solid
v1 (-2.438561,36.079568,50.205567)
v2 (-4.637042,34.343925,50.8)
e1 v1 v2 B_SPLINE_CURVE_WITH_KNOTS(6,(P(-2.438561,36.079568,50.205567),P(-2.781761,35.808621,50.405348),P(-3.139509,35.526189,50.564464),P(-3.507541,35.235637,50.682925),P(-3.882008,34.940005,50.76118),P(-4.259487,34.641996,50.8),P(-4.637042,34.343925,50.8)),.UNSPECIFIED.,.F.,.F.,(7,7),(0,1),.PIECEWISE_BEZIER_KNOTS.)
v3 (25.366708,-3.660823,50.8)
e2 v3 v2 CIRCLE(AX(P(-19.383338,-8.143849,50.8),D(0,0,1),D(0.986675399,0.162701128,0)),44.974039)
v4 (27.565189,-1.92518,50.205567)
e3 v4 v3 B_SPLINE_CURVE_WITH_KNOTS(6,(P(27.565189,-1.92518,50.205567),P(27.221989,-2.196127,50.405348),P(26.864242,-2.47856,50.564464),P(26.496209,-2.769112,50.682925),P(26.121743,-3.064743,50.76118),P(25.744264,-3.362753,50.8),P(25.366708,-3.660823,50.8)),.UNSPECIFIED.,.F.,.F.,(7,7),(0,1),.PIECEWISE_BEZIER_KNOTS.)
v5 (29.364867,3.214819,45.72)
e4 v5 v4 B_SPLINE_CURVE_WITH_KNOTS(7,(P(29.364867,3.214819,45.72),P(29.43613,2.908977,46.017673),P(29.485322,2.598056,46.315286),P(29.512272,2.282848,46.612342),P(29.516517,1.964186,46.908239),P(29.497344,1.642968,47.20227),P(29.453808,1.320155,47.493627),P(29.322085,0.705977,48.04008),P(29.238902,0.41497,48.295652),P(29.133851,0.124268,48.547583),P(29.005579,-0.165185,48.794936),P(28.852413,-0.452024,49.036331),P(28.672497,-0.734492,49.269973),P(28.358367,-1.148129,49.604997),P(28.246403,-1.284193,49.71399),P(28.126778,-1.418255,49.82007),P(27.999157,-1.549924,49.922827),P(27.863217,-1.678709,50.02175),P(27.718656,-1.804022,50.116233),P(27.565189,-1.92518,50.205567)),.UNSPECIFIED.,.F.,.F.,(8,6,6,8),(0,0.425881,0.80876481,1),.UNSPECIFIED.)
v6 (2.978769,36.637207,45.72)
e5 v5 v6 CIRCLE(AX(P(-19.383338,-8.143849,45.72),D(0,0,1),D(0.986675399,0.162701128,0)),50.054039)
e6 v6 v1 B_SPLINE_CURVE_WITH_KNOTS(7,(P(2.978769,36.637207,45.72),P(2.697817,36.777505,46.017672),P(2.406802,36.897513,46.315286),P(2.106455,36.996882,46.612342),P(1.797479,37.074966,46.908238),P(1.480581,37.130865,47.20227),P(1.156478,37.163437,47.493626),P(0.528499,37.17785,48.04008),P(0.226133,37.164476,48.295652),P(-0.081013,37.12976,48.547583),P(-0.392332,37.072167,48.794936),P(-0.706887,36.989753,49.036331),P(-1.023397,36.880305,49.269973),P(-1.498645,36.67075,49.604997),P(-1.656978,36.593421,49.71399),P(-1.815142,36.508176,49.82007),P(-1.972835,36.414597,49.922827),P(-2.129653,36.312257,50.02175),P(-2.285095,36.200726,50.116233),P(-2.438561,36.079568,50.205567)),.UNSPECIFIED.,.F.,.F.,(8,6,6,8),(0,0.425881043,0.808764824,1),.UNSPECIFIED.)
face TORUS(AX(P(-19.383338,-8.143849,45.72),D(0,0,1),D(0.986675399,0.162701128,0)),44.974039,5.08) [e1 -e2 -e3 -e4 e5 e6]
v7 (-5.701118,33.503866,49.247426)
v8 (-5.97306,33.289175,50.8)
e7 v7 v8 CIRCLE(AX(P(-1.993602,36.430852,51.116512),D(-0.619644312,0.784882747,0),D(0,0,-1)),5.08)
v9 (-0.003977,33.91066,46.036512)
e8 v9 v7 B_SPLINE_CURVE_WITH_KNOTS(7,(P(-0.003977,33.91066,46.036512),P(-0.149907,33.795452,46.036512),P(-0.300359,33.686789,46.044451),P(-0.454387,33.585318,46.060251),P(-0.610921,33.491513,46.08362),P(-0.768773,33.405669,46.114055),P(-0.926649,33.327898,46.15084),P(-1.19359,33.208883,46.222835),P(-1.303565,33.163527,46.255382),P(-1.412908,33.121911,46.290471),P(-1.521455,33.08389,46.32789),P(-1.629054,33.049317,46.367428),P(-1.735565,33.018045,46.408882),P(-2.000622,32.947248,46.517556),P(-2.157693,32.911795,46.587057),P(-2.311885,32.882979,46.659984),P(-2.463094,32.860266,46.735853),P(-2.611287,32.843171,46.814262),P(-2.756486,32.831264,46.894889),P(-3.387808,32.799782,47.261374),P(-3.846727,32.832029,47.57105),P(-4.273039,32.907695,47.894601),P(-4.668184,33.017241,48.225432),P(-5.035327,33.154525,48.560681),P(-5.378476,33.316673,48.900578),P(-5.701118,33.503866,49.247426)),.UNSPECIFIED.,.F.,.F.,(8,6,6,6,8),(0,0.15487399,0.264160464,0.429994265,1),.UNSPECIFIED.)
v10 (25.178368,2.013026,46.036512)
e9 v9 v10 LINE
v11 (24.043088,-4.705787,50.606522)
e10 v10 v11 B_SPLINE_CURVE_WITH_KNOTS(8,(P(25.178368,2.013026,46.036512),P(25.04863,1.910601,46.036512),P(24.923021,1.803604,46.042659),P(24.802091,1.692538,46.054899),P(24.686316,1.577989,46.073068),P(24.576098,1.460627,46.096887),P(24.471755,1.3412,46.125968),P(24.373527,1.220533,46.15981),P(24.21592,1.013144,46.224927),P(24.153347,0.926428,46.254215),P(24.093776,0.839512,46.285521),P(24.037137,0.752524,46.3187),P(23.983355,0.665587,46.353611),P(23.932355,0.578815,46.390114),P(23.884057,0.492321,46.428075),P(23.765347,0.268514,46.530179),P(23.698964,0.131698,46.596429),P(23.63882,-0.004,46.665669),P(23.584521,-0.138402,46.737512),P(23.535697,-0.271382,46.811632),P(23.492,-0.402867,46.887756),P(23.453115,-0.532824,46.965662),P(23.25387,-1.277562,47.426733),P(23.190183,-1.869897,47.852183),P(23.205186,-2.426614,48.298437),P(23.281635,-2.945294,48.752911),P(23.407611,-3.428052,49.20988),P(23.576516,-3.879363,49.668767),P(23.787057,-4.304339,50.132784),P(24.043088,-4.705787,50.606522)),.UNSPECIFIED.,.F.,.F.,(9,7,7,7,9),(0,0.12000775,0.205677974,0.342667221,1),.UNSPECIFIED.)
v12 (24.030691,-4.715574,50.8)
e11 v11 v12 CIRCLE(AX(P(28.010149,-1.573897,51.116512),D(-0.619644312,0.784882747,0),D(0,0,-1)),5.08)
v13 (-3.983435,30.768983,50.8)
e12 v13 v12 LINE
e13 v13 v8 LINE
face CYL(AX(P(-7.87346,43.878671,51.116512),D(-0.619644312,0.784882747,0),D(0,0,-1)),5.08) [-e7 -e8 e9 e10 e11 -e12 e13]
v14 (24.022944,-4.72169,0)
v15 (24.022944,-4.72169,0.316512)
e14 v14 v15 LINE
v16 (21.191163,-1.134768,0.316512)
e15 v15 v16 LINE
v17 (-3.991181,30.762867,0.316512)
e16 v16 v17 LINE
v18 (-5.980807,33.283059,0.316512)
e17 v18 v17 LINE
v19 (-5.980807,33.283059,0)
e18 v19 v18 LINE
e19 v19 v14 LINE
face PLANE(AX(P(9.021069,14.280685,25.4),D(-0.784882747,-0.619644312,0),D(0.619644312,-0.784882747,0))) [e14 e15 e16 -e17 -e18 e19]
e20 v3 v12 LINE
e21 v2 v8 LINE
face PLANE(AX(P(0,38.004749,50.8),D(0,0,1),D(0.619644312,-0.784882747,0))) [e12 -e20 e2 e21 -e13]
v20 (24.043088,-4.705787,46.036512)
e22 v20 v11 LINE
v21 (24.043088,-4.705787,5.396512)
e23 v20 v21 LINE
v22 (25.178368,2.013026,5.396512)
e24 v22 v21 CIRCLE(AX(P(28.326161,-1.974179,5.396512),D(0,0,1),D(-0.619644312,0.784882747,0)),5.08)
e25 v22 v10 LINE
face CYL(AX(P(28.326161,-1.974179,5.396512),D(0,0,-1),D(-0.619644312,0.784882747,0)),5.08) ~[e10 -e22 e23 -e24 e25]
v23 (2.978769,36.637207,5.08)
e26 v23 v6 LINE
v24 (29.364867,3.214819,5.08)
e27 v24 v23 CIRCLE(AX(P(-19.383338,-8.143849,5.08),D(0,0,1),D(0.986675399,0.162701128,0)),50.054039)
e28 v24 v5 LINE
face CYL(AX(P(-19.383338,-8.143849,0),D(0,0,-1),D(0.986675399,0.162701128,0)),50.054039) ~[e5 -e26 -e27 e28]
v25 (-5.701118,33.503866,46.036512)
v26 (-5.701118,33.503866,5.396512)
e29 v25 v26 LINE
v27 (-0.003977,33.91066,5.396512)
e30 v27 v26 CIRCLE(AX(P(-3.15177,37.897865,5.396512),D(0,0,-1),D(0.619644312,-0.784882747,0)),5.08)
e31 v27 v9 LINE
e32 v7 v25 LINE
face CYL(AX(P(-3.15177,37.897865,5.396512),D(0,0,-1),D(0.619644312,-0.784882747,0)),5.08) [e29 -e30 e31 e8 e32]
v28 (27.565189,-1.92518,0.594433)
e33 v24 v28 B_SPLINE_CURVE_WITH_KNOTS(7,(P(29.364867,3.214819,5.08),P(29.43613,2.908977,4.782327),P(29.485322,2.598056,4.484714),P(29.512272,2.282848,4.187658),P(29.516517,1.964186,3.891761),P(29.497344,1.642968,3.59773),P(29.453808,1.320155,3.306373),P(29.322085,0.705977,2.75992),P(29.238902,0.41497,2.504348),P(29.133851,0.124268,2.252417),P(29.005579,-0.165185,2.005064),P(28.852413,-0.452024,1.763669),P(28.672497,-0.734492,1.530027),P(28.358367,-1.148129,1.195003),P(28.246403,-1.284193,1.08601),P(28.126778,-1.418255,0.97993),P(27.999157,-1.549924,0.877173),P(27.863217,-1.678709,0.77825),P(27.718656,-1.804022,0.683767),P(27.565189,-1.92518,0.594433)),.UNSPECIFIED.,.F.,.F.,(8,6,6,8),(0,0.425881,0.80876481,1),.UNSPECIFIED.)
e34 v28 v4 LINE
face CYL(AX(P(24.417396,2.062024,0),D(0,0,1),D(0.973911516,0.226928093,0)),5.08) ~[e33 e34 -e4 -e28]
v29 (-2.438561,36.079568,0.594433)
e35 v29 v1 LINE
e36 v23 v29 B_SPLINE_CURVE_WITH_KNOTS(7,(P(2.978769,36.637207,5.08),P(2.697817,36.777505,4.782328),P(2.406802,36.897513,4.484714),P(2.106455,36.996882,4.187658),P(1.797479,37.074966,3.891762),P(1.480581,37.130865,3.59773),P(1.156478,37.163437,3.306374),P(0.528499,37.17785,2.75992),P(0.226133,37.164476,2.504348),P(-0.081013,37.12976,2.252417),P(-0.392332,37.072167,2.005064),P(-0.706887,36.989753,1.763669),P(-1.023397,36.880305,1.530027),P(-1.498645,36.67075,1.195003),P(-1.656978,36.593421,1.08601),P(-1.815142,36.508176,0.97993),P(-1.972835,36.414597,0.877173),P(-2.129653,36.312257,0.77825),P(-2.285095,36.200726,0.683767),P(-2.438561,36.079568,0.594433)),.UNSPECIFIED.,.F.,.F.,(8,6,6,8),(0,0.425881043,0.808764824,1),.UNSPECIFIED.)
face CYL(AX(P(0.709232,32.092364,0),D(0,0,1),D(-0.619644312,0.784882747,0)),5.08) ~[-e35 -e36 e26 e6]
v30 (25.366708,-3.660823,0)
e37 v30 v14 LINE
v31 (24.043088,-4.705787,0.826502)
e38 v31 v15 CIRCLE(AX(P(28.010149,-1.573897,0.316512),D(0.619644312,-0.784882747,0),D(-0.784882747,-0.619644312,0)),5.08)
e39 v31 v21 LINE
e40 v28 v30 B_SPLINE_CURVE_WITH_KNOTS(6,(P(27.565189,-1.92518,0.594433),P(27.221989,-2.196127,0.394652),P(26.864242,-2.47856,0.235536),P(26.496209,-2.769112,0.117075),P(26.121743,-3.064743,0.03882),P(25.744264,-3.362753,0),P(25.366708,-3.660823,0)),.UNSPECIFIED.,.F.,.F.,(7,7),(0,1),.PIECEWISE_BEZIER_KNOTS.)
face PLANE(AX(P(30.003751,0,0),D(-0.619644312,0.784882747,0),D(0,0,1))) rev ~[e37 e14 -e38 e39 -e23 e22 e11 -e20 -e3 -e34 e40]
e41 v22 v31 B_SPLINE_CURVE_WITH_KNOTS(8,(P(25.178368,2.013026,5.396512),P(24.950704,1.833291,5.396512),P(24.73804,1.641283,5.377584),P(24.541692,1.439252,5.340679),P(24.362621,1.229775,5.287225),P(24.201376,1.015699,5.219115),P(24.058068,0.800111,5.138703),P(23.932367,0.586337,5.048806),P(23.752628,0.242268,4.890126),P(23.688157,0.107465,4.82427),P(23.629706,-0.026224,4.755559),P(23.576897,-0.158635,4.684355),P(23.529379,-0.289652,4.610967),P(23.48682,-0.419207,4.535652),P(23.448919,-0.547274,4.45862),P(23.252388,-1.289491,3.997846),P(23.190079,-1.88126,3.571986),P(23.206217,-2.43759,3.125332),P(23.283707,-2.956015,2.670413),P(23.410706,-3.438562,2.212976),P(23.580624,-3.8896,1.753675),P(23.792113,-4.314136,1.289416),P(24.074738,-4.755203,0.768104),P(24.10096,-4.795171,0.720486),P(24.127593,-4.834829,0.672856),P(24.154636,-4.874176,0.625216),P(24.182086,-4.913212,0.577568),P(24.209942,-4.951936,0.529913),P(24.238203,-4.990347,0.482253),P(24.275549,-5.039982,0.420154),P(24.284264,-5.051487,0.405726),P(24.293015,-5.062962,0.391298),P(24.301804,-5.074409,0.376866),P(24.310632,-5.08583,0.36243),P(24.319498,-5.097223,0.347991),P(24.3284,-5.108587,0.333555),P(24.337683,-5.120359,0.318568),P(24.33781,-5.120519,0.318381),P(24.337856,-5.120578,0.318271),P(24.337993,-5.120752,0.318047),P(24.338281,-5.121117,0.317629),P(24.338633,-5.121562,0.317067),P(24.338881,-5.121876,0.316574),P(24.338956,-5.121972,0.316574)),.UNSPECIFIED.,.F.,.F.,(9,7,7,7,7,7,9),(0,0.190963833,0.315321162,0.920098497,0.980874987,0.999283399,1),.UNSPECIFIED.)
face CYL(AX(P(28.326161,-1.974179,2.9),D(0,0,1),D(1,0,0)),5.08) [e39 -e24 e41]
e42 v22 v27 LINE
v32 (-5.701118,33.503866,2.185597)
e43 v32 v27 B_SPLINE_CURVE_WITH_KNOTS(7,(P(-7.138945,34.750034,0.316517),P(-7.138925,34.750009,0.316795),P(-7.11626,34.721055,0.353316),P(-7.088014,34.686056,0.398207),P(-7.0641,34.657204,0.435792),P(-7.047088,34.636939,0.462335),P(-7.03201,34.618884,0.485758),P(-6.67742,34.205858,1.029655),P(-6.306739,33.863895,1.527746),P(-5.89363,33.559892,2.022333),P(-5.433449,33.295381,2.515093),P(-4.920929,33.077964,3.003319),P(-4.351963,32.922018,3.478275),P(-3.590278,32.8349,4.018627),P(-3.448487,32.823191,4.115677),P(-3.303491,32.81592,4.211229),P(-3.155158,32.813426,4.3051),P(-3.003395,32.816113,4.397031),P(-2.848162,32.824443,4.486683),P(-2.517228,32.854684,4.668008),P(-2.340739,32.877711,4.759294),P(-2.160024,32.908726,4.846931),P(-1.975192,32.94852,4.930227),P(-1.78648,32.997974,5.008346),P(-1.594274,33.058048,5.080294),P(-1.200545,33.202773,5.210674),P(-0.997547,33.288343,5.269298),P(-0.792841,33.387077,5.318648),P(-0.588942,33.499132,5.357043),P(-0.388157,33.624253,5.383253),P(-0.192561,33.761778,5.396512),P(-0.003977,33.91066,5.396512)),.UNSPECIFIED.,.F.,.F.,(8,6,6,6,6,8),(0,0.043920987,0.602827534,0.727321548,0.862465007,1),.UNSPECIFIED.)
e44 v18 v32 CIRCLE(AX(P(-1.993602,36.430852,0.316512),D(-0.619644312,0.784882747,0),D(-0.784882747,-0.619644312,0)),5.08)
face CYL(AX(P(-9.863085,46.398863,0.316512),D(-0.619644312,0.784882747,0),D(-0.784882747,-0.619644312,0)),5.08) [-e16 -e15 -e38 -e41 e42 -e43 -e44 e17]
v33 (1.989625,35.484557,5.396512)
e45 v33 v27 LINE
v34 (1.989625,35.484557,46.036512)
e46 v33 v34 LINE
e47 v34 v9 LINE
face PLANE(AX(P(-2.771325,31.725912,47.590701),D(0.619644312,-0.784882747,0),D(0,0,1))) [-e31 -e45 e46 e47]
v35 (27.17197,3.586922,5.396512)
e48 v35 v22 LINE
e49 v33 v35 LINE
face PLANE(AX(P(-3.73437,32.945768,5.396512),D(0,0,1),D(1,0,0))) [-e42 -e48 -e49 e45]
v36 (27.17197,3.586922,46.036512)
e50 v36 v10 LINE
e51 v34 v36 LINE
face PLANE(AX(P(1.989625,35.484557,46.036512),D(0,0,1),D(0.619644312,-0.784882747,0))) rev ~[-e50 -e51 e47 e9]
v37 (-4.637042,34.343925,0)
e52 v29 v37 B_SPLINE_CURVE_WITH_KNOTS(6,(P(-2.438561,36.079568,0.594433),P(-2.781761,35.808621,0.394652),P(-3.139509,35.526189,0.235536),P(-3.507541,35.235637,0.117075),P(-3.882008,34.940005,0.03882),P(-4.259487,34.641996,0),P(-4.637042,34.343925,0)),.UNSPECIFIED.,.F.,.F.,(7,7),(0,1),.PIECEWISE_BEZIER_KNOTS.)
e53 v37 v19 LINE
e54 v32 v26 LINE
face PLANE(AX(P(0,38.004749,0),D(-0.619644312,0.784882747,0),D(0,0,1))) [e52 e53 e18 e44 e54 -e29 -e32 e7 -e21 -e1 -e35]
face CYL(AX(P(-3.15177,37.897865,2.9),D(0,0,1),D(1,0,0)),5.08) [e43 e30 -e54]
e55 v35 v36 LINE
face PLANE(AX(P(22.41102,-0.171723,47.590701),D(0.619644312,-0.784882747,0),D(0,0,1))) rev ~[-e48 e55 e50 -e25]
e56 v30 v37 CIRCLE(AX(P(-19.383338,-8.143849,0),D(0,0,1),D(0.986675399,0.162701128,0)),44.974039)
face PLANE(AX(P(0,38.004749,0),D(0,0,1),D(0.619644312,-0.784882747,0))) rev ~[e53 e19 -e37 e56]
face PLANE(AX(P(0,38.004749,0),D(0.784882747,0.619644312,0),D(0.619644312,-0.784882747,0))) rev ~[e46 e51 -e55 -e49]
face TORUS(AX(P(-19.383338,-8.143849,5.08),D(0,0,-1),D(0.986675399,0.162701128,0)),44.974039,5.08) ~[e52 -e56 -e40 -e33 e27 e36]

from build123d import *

# Parameters (mm, degrees)
F1_DEPTH     = 50.8
F2_W         = 48.4209248795
F2_H         = 50.8
F2_W_2       = 40.64
F2_H_2       = 40.64
F3_DEPTH     = 7.62
F4_T1_DEPTH  = 40.64
F4_T3_DEPTH  = 40.64
F4_T9_DEPTH  = 53.34
F4_T15_DEPTH = 53.34
F4_T24_DEPTH = 53.34
F4_T30_DEPTH = 53.34
F5_T1_DEPTH  = 40.64
F5_T6_DEPTH  = 17.2700101558
F5_S7_R      = 5.0800000001
F5_T8_DEPTH  = 13
F5_T12_DEPTH = 15.9109147238
F5_S13_R     = 5.0800000001
F5_T14_DEPTH = 12
F6_R         = 5.08


# Not quite as in the source:
# - a fillet or chamfer that OpenCascade refuses, or shapes differently, is made with other operations: its cross-section is extruded or revolved along the edge and cut away or added


with BuildPart() as f1:
    # F0 (on Top) → F1 (new body)
    with BuildSketch(Plane.XY):
        with BuildLine():
            Line((0, 38.0047485232), (30.0037506968, 0))
            ThreePointArc((30.0037506968, 0), (19.9032134253, 22.871851931), (0, 38.0047485232))
        make_face()
    extrude(amount=F1_DEPTH)

    # F2 (on face) → F3 (join)
    with BuildSketch(Plane(origin=(18.4835383706, 14.5922680406, 0), x_dir=(0.6196443123, -0.7848827468, 0), z_dir=(-0.7848827468, -0.6196443123, 0))):
        with Locations((-5.6188089735, 25.4)):
            Rectangle(F2_W, F2_H)
        with Locations((-6.2983566895, 25.7165116596)):
            Rectangle(F2_W_2, F2_H_2, mode=Mode.SUBTRACT)
    extrude(amount=F3_DEPTH)

    # F4: fillet of radius 5.08 on 3 edges, made by hand

    # F4_s2 → F4_t1 (cut)
    with BuildSketch(Plane(origin=(-16.4939133248, 20.8922889144, 0), x_dir=(0, 0, 1), z_dir=(0.6196443123, -0.7848827468, 0))):
        with BuildLine():
            ThreePointArc((46.0365116596, -21.0094262619), (47.5244092112, -17.4173238135), (51.1165116596, -15.9294262619))
            Line((51.1165116596, -15.9294262619), (46.0365116596, -15.9294262619))
            Line((46.0365116596, -15.9294262619), (46.0365116596, -21.0094262619))
        make_face()
    extrude(amount=F4_T1_DEPTH, mode=Mode.SUBTRACT)

    # F4_s4 → F4_t3 (cut)
    with BuildSketch(Plane.XY.offset(5.3965116596)):
        with BuildLine():
            ThreePointArc((25.1783677198, 2.0130255709), (23.2809557383, -1.3806253977), (24.3389564723, -5.1219718894))
            Line((24.3389564723, -5.1219718894), (21.1911633659, -1.1347675355))
            Line((21.1911633659, -1.1347675355), (25.1783677198, 2.0130255709))
        make_face()
        with BuildLine():
            ThreePointArc((-0.0039771311, 33.9106604018), (-3.7453236228, 32.8526596678), (-7.1389745914, 34.7500716493))
            Line((-7.1389745914, 34.7500716493), (-3.991181485, 30.7628672955))
            Line((-3.991181485, 30.7628672955), (-0.0039771311, 33.9106604018))
        make_face()
    extrude(amount=F4_T3_DEPTH, mode=Mode.SUBTRACT)


with BuildPart() as f4_tool7:
    # F4_s8 → F4_t9 (new body)
    with BuildSketch(Plane(origin=(-24.3633960907, 30.8602997991, 0), x_dir=(0, 0, 1), z_dir=(0.6196443123, -0.7848827468, 0))):
        with BuildLine():
            ThreePointArc((46.0365116596, -21.0094262619), (47.5244092112, -17.4173238135), (51.1165116596, -15.9294262619))
            Line((51.1165116596, -15.9294262619), (46.0365116596, -15.9294262619))
            Line((46.0365116596, -15.9294262619), (46.0365116596, -21.0094262619))
        make_face()
    extrude(amount=F4_T9_DEPTH)

    split(bisect_by=Plane(origin=(-16.4939133248, 20.8922889144, 0), x_dir=(0, 0, 1), z_dir=(-0.6196443123, 0.7848827468, 0)), keep=Keep.TOP)

    split(bisect_by=Plane.XY.offset(50.8), keep=Keep.BOTTOM)

    split(bisect_by=Plane(origin=(-18.4835383706, 23.4124804826, 0), x_dir=(0, 0, 1), z_dir=(0.6196443123, -0.7848827468, 0)), keep=Keep.TOP)


with BuildPart() as f4_tool13:
    # F4_s14 → F4_t15 (new body)
    with BuildSketch(Plane.XY.offset(5.3965116596)):
        with BuildLine():
            ThreePointArc((-0.0039771311, 33.9106604018), (-3.7453236228, 32.8526596678), (-7.1389745914, 34.7500716493))
            Line((-7.1389745914, 34.7500716493), (-3.991181485, 30.7628672955))
            Line((-3.991181485, 30.7628672955), (-0.0039771311, 33.9106604018))
        make_face()
    extrude(amount=F4_T15_DEPTH)

    split(bisect_by=Plane.XY.offset(46.0365116596), keep=Keep.TOP)

    split(bisect_by=Plane.XY.offset(50.8), keep=Keep.BOTTOM)

    split(bisect_by=Plane(origin=(-18.4835383706, 23.4124804826, 0), x_dir=(0, 0, 1), z_dir=(0.6196443123, -0.7848827468, 0)), keep=Keep.TOP)


with BuildPart() as f4_tool7_1:
    add(f4_tool7.part)

    # F4_t19: intersect F4_tool13
    add(f4_tool13.part, mode=Mode.INTERSECT)


with BuildPart() as f1_1:
    add(f1.part)

    # F4_t5: cut F4_tool7
    add(f4_tool7_1.part, mode=Mode.SUBTRACT)


with BuildPart() as f4_tool22:
    # F4_s23 → F4_t24 (new body)
    with BuildSketch(Plane(origin=(-16.4939133248, 20.8922889144, 0), x_dir=(0, 0, 1), z_dir=(0.6196443123, -0.7848827468, 0))):
        with BuildLine():
            ThreePointArc((46.0365116596, -21.0094262619), (47.5244092112, -17.4173238135), (51.1165116596, -15.9294262619))
            Line((51.1165116596, -15.9294262619), (46.0365116596, -15.9294262619))
            Line((46.0365116596, -15.9294262619), (46.0365116596, -21.0094262619))
        make_face()
    extrude(amount=F4_T24_DEPTH)

    split(bisect_by=Plane(origin=(8.6884315261, -11.0053459165, 0), x_dir=(0, 0, 1), z_dir=(0.6196443123, -0.7848827468, 0)), keep=Keep.TOP)

    split(bisect_by=Plane(origin=(11.5202123262, -14.5922680406, 0), x_dir=(0, 0, 1), z_dir=(-0.6196443123, 0.7848827468, 0)), keep=Keep.TOP)

    split(bisect_by=Plane.XY.offset(50.8), keep=Keep.BOTTOM)


with BuildPart() as f4_tool28:
    # F4_s29 → F4_t30 (new body)
    with BuildSketch(Plane.XY.offset(58.7365116596)):
        with BuildLine():
            ThreePointArc((25.1783677198, 2.0130255709), (23.2809557383, -1.3806253977), (24.3389564723, -5.1219718894))
            Line((24.3389564723, -5.1219718894), (21.1911633659, -1.1347675355))
            Line((21.1911633659, -1.1347675355), (25.1783677198, 2.0130255709))
        make_face()
    extrude(amount=-F4_T30_DEPTH)

    split(bisect_by=Plane.XY.offset(46.0365116596), keep=Keep.TOP)

    split(bisect_by=Plane(origin=(11.5202123262, -14.5922680406, 0), x_dir=(0, 0, 1), z_dir=(-0.6196443123, 0.7848827468, 0)), keep=Keep.TOP)

    split(bisect_by=Plane.XY.offset(50.8), keep=Keep.BOTTOM)


with BuildPart() as f4_tool22_1:
    add(f4_tool22.part)

    # F4_t34: intersect F4_tool28
    add(f4_tool28.part, mode=Mode.INTERSECT)


with BuildPart() as f1_2:
    add(f1_1.part)

    # F4_t20: cut F4_tool22
    add(f4_tool22_1.part, mode=Mode.SUBTRACT)

    # F5: fillet of radius 5.08 on 1 edges, made by hand

    # F5_s2 → F5_t1 (cut)
    with BuildSketch(Plane(origin=(8.6884315261, -11.0053459165, 0), x_dir=(0, 0, 1), z_dir=(-0.6196443123, 0.7848827468, 0))):
        with BuildLine():
            ThreePointArc((0.3165116596, 15.9294262619), (3.908614108, 17.4173238135), (5.3965116596, 21.0094262619))
            Line((5.3965116596, 21.0094262619), (5.3965116596, 15.9294262619))
            Line((5.3965116596, 15.9294262619), (0.3165116596, 15.9294262619))
        make_face()
    extrude(amount=F5_T1_DEPTH, mode=Mode.SUBTRACT)


with BuildPart() as f5_tool4:
    # F5_s5 → F5_t6 (new body)
    with BuildSketch(Plane(origin=(19.3896950922, -24.5602789253, 0), x_dir=(0, 0, 1), z_dir=(-0.6196443123, 0.7848827468, 0))):
        with BuildLine():
            ThreePointArc((0.3165116596, 15.9294262619), (3.908614108, 17.4173238135), (5.3965116596, 21.0094262619))
            Line((5.3965116596, 21.0094262619), (5.3965116596, 15.9294262619))
            Line((5.3965116596, 15.9294262619), (0.3165116596, 15.9294262619))
        make_face()
    extrude(amount=F5_T6_DEPTH)

    # F5_s7 → F5_t8 (cut, symmetric)
    with BuildSketch(Plane.XY.offset(2.9)):
        with Locations((28.3261608263, -1.974178783)):
            Circle(F5_S7_R)
    extrude(amount=F5_T8_DEPTH, both=True, mode=Mode.SUBTRACT)


with BuildPart() as f1_3:
    add(f1_2.part)

    # F5_t3: cut F5_tool4
    add(f5_tool4.part, mode=Mode.SUBTRACT)


with BuildPart() as f5_tool10:
    # F5_s11 → F5_t12 (new body)
    with BuildSketch(Plane(origin=(-26.3530211368, 33.3804913668, 0), x_dir=(0, 0, 1), z_dir=(0.6196443123, -0.7848827468, 0))):
        with BuildLine():
            ThreePointArc((0.3165116596, -15.9294262623), (3.908614108, -17.4173238139), (5.3965116596, -21.0094262623))
            Line((5.3965116596, -21.0094262623), (5.3965116596, -15.9294262623))
            Line((5.3965116596, -15.9294262623), (0.3165116596, -15.9294262623))
        make_face()
    extrude(amount=F5_T12_DEPTH)

    # F5_s13 → F5_t14 (cut, symmetric)
    with BuildSketch(Plane.XY.offset(2.9)):
        with Locations((-3.1517702375, 37.8978647558)):
            Circle(F5_S13_R)
    extrude(amount=F5_T14_DEPTH, both=True, mode=Mode.SUBTRACT)


with BuildPart() as f1_4:
    add(f1_3.part)

    # F5_t9: cut F5_tool10
    add(f5_tool10.part, mode=Mode.SUBTRACT)

    # F6
    f6_edges = [f1_4.edges().sort_by_distance(p)[0] for p in [
        (19.903213, 22.871852, 50.8),
        (30.003751, 0, 25.4),
        (19.903213, 22.871852, 0),
        (0, 38.004749, 25.4),
    ]]
    fillet(f6_edges, radius=F6_R)


solid = f1_4.part
